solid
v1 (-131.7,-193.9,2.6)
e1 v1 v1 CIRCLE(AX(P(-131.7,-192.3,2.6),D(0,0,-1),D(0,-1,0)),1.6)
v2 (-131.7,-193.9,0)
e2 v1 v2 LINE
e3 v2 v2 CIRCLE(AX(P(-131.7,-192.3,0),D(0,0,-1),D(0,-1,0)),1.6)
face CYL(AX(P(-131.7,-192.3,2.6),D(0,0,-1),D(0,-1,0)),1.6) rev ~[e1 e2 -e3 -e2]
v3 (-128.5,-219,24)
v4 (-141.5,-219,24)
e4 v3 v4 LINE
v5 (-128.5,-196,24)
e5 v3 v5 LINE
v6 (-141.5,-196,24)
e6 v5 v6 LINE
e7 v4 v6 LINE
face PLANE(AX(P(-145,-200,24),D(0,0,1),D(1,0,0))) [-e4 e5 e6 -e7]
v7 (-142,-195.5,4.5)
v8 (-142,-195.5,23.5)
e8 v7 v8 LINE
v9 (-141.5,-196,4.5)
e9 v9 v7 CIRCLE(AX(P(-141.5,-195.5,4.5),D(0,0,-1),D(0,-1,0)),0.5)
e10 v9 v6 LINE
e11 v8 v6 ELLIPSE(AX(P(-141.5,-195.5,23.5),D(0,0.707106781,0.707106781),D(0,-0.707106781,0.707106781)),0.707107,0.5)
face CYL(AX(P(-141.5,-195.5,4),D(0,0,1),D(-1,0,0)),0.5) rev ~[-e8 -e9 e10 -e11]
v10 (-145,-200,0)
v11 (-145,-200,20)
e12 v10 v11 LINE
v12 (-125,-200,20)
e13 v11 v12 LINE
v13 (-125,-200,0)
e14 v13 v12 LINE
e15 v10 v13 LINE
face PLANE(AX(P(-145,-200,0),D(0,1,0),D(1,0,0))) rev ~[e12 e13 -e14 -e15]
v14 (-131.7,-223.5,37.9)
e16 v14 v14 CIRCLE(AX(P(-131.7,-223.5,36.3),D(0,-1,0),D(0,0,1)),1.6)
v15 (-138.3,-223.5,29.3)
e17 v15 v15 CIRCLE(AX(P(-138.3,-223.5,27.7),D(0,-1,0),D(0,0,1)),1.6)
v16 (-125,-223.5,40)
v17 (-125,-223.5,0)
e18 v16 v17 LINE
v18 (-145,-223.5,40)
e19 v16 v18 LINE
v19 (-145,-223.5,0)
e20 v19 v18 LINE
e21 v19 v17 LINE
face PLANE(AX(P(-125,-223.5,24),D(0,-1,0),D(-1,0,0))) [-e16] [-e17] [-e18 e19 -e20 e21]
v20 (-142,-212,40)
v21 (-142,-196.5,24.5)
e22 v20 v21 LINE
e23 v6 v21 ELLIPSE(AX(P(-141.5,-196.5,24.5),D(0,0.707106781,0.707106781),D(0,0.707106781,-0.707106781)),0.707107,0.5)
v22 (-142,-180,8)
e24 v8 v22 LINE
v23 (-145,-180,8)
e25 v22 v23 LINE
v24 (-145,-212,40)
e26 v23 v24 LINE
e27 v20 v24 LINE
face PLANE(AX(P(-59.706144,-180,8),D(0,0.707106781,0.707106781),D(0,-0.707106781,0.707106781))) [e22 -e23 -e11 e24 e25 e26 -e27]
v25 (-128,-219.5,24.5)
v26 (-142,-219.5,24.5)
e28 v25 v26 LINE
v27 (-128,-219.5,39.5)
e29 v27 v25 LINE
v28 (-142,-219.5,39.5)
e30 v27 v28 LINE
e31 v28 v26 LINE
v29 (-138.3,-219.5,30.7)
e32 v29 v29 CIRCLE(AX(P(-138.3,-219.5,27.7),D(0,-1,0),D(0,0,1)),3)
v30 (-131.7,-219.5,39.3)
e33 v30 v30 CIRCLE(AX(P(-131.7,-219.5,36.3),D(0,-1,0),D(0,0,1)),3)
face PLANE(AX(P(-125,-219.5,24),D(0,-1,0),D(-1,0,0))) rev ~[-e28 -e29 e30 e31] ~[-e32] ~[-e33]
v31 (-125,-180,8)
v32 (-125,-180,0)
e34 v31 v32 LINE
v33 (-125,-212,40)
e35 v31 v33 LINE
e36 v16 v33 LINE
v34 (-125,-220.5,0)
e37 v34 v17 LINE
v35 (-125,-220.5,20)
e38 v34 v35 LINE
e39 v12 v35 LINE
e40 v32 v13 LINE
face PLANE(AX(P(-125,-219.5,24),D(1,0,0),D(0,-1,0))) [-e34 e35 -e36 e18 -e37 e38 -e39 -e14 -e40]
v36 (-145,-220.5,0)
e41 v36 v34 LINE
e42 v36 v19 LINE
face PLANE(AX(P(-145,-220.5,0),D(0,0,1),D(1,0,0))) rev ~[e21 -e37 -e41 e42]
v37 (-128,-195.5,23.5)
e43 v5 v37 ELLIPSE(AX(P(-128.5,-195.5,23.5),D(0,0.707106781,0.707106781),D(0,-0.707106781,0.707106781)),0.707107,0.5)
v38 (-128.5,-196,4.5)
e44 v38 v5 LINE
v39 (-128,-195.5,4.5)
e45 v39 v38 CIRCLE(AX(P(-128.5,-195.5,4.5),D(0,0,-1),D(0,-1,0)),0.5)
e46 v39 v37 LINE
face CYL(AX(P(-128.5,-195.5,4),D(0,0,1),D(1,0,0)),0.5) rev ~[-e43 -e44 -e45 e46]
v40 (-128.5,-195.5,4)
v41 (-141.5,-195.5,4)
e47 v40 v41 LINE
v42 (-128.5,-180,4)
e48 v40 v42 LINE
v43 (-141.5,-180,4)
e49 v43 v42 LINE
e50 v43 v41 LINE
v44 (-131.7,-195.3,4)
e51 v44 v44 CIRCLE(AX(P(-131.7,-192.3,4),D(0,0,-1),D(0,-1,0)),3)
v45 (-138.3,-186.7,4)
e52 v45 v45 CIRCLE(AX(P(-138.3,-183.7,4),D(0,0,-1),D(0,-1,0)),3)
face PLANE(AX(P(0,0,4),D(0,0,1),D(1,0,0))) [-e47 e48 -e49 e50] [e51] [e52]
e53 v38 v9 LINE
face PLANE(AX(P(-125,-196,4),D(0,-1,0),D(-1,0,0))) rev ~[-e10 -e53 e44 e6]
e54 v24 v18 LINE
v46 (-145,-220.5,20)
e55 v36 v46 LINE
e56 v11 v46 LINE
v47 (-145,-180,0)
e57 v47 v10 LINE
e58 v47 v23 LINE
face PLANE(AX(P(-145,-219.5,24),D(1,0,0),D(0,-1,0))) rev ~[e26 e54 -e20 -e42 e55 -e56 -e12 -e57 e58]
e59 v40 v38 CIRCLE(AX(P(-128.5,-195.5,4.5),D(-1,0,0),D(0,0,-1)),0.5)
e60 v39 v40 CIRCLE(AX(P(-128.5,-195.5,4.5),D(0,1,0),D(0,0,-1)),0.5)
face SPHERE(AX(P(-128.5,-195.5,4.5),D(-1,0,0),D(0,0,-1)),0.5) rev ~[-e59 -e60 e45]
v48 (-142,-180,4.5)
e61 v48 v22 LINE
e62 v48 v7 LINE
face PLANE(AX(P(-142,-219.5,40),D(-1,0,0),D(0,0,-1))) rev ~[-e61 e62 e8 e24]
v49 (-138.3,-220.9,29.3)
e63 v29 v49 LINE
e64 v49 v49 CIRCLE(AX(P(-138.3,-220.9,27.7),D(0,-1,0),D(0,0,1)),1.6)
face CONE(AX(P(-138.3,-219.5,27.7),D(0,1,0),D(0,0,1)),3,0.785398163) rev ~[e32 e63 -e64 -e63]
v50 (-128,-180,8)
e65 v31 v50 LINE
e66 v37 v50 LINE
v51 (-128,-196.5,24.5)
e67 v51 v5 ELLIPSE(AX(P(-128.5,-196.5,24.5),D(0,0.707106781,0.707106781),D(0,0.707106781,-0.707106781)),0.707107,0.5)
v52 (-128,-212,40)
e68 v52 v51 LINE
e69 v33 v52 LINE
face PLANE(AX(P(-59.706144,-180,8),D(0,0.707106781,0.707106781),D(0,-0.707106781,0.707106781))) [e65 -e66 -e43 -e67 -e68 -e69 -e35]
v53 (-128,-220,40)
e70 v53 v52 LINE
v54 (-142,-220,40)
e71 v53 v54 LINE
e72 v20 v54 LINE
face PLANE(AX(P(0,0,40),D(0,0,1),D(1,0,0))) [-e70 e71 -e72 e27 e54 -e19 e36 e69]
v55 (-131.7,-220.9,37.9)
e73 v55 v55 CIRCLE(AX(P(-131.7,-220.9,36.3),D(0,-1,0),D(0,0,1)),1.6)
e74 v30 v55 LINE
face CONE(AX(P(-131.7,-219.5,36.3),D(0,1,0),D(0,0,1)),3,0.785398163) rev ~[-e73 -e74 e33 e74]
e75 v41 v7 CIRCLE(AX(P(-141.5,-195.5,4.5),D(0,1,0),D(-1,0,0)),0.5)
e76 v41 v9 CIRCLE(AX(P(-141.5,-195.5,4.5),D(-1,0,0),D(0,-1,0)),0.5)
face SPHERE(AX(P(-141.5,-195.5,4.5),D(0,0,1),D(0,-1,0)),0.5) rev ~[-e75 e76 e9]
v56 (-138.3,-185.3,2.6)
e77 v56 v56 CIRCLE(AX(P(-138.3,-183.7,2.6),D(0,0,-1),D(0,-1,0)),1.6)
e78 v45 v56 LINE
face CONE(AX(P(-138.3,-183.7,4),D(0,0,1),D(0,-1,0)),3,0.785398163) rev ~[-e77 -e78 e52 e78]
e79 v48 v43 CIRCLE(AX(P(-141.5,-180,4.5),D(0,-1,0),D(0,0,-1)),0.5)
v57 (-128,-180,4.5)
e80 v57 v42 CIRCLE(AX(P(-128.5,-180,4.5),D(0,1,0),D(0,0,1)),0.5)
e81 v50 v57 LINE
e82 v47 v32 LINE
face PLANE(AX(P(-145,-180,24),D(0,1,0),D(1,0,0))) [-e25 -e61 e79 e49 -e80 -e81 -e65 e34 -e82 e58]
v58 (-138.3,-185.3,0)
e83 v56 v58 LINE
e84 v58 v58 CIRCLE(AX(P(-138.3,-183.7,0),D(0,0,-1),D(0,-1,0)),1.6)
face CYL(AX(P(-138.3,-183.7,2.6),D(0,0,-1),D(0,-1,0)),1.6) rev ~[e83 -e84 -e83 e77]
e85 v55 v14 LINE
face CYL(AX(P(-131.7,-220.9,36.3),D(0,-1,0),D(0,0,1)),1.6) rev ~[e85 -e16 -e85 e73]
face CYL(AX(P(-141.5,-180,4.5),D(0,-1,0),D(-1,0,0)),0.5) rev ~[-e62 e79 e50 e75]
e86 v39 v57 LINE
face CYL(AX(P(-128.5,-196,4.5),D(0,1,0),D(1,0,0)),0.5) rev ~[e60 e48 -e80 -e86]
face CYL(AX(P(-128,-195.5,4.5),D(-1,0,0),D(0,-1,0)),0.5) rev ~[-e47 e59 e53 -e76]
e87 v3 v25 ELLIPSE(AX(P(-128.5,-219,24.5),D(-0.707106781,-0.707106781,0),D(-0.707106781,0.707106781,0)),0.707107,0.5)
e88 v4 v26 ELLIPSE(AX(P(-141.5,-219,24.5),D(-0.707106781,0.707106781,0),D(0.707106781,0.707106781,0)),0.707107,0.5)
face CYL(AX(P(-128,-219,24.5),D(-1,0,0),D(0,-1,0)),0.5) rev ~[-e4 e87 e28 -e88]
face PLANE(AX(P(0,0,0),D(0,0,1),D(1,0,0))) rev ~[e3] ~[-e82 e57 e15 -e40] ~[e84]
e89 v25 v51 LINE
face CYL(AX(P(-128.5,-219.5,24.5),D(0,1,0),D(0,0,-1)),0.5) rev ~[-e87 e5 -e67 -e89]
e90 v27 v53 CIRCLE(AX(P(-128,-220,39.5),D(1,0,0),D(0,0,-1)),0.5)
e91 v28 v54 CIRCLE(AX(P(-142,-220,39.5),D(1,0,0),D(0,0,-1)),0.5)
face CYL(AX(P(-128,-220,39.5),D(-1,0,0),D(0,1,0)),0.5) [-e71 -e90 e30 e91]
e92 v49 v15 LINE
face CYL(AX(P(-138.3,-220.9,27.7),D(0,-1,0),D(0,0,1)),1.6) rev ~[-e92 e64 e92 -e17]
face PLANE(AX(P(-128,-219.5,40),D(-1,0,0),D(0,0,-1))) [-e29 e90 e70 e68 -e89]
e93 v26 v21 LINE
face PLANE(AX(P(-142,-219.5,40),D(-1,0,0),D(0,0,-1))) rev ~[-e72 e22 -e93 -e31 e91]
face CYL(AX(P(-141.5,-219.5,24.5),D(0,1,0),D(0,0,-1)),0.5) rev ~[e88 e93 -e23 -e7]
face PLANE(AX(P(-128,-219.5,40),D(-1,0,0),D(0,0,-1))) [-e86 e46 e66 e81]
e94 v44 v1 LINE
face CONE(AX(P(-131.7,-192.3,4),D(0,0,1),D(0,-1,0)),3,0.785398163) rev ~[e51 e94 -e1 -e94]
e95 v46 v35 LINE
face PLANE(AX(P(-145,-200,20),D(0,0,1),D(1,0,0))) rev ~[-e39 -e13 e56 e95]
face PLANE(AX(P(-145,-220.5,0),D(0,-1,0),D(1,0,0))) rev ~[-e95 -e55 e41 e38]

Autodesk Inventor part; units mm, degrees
ref_plane "YZ Plane" through (0, 0, 0) normal (1, 0, 0) x (0, 1, 0)
ref_plane "XZ Plane" through (0, 0, 0) normal (0, 1, 0) x (-1, 0, 0)
ref_plane "Plano de trabajo1" through (0, 0, 0) normal (0, 0, 1) x (1, 0, 0)
sketch "Boceto1" plane through (0, 0, 0) normal (0, 0, 1) x (1, 0, 0)
  line L0 (-395, -200.5) -> (-395, -220.5) projected
  line L1 (-395, -220.5) -> (335, -220.5) projected
  line L2 (335, -200.5) -> (335, -220.5) projected
  line L3 (-395, -200.5) -> (335, -200.5) projected
  line L4 (-145, 767.5) -> (-145, -767.5) projected
  line L5 (-145, -767.5) -> (145, -767.5) projected
  line L6 (145, -767.5) -> (145, 767.5) projected
  line L7 (145, 767.5) -> (-145, 767.5) projected
  line L8 (335.5, -200) -> (335.5, -221)
  line L9 (335.5, -221) -> (-395.5, -221)
  line L10 (-395.5, -221) -> (-395.5, -200)
  line L11 (-395.5, -200) -> (335.5, -200)
  line L12 (-145, -200) -> (-145, -180)
  line L13 (-145, -180) -> (-125, -180)
  line L14 (-125, -180) -> (-125, -200)
  line L15 (-125, -200) -> (-145, -200)
  line L16 (-145, -200) -> (-145, -180)
  point P0 (0, 0)
  dimension "d0" = 0.5
  dimension "d1" = 20
  dimension "d2" = 20
  dimension "d3" = 20
extrude "Extrusión1" add sketch "Boceto1" along normal blind 4 contours L4 L13 L14 L11
sketch "Boceto3" plane through (0, 0, 4) normal (0, 0, 1) x (1, 0, 0)
  line L0 (-125, -180) -> (-145, -180) projected
  line L1 (-145, -180) -> (-145, -200) projected
  line L2 (-145, -200) -> (-125, -200) projected
  line L3 (-125, -200) -> (-125, -180) projected
  line L4 (-145, -200) -> (-125, -200)
  line L5 (-125, -200) -> (-125, -196)
  line L6 (-125, -196) -> (-145, -196)
  line L7 (-145, -196) -> (-145, -200)
  point P0 (0, 0)
  dimension "d6" = 4
extrude "Extrusión2" add sketch "Boceto3" along normal blind 20 contours L3 L2 L1 L6
sketch "Boceto4" plane through (-145, -200, 0) normal (0, -1, 0) x (1, 0, 0)
  line L0 (0, 0) -> (20, 0) projected
  line L1 (20, 0) -> (20, 24) projected
  line L2 (0, 24) -> (20, 24) projected
  line L3 (0, 0) -> (0, 24) projected
  line L4 (0, 24) -> (20, 24) projected
  line L5 (20, 24) -> (0, 24)
  line L6 (0, 24) -> (0, 20)
  line L7 (0, 20) -> (20, 20)
  line L8 (20, 20) -> (20, 24)
  point P0 (145, 0)
  dimension "d9" = 4
extrude "Extrusión3" add sketch "Boceto4" along normal blind 20.5 contours L3 L2 L1 L7
sketch "Boceto6" plane through (0, 0, 4) normal (0, 0, 1) x (1, 0, 0)
  line L0 (-145, -196) -> (-125, -196) projected
  line L1 (-125, -196) -> (-125, -180) projected
  line L2 (-125, -180) -> (-145, -180) projected
  line L3 (-145, -180) -> (-145, -196) projected
  line L4 (-145, -180) -> (-142, -180)
  line L5 (-142, -180) -> (-142, -196)
  line L6 (-142, -196) -> (-145, -196)
  line L7 (-145, -196) -> (-145, -180)
  line L8 (-125, -196) -> (-128, -196)
  line L9 (-128, -196) -> (-128, -180)
  line L10 (-128, -180) -> (-125, -180)
  line L11 (-125, -180) -> (-125, -196)
  point P0 (0, 0)
  dimension "d12" = 3
  dimension "d13" = 16
  dimension "d14" = 3
extrude "Extrusión4" add sketch "Boceto6" along normal blind 20 contours L3 L2 L5 L0 | L9 L2 L1 L0
chamfer "Chaflán1" [suppressed]
sketch "Boceto7" plane through (0, 0, 4) normal (0, 0, 1) x (1, 0, 0)
  line L0 (-142, -180) -> (-142, -196) projected
  line L1 (-142, -196) -> (-128, -196) projected
  line L2 (-128, -196) -> (-128, -180) projected
  line L3 (-128, -180) -> (-142, -180) projected
  line L4 (-138.3, -192.3) -> (-138.3, -183.7)
  line L5 (-138.3, -183.7) -> (-131.7, -183.7)
  line L6 (-131.7, -183.7) -> (-131.7, -192.3)
  line L7 (-131.7, -192.3) -> (-138.3, -192.3)
  circle A0 centre (-138.3, -183.7) radius 3
  circle A1 centre (-131.7, -192.3) radius 3
  circle A2 centre (-138.3, -183.7) radius 1.65
  circle A3 centre (-131.7, -192.3) radius 1.65
  point P0 (0, 0)
  dimension "d20" = 3.7
  dimension "d21" = 6
  dimension "d22" = 6
  dimension "d23" = 3.3
  dimension "d24" = 3.3
hole "Agujero1" at (-138.3, -183.7, 4) at (-131.7, -192.3, 4) direction (0, 0, -1) diameter 3.2 end through all countersink diameter 6 countersink angle 90
sketch "Boceto8" plane through (-145, -220.5, 0) normal (0, -1, 0) x (1, 0, 0)
  line L0 (17, 24) -> (17, 4) projected
  line L1 (20, 20) -> (0, 20) projected
  line L2 (0, 0) -> (0, 20) projected
  line L3 (0, 0) -> (20, 0) projected
  line L4 (20, 0) -> (20, 20) projected
  line L5 (20, 20) -> (20, 24) projected
  line L6 (20, 24) -> (0, 24) projected
  line L7 (0, 24) -> (0, 20) projected
  line L8 (0, 20) -> (20, 20) projected
  point P0 (145, 0)
extrude "Extrusión5" add sketch "Boceto8" along normal blind 3
sketch "Boceto9" plane through (0, 0, 24) normal (0, 0, 1) x (1, 0, 0)
  line L0 (-145, -180) -> (-145, -223.5) projected
  line L1 (-125, -223.5) -> (-145, -223.5) projected
  line L2 (-125, -180) -> (-125, -223.5) projected
  line L3 (-128, -196) -> (-142, -196) projected
  line L4 (-145, -223.5) -> (-125, -223.5)
  line L5 (-125, -223.5) -> (-125, -219.5)
  line L6 (-125, -219.5) -> (-145, -219.5)
  line L7 (-145, -219.5) -> (-145, -223.5)
  line L8 (-125, -180) -> (-128, -180) projected
  line L9 (-128, -180) -> (-128, -196) projected
  line L10 (-142, -196) -> (-142, -180) projected
  line L11 (-142, -180) -> (-145, -180) projected
  point P0 (0, 0)
  dimension "d35" = 4
extrude "Extrusión6" add sketch "Boceto9" along normal blind 16 contours L6 L2 L1 L0
sketch "Boceto10" plane through (-145, -219.5, 24) normal (0, 1, 0) x (1, 0, 0)
  line L0 (0, 0) -> (20, 0) projected
  line L1 (0, 0) -> (0, -16) projected
  line L2 (20, -16) -> (0, -16) projected
  line L3 (20, 0) -> (20, -16) projected
  line L4 (20, -16) -> (17, -16)
  line L5 (17, -16) -> (17, 0)
  line L6 (17, 0) -> (20, 0)
  line L7 (20, 0) -> (20, -16)
  line L8 (0, -16) -> (3, -16)
  line L9 (3, -16) -> (3, 0)
  line L10 (3, 0) -> (0, 0)
  line L11 (0, 0) -> (0, -16)
  point P0 (145, 24)
  point P1 (3, -16)
  point P2 (3, 0)
  point P3 (17, -16)
  dimension "d38" = 3
  dimension "d39" = 3
  dimension "d40" = 16
extrude "Extrusión7" add sketch "Boceto10" along normal up to surface (39.5 mm away) contours L0 L9 L2 L1 | L0 L3 L2 L5
chamfer "Chaflán2" [suppressed]
chamfer "Chaflán3" [suppressed]
sketch "Boceto11" plane through (-142, -219.5, 24) normal (0, 1, 0) x (1, 0, 0)
  line L0 (0, 0) -> (0, -16) projected
  line L1 (14, -16) -> (0, -16) projected
  line L2 (14, -16) -> (14, 0) projected
  line L3 (0, 0) -> (14, 0) projected
  line L4 (3.7, -12.3) -> (3.7, -3.7)
  line L5 (3.7, -3.7) -> (10.3, -3.7)
  line L6 (10.3, -3.7) -> (10.3, -12.3)
  line L7 (10.3, -12.3) -> (3.7, -12.3)
  circle A0 centre (3.7, -3.7) radius 1.6
  circle A1 centre (10.3, -12.3) radius 1.6
  point P0 (142, 24)
  dimension "d49" = 3.7
  dimension "d50" = 3.2
  dimension "d51" = 3.2
hole "Agujero2" at (-131.7, -219.5, 36.3) at (-138.3, -219.5, 27.7) direction (0, -1, 0) diameter 3.2 end through all countersink diameter 6 countersink angle 90
fillet "Empalme2" radius 0.5 9 edges at (-135, -219.5, 40) (-142, -207.75, 24) (-128, -207.75, 24) (-135, -219.5, 24) (-142, -196, 14) (-135, -196, 4) (-142, -188, 4) (-128, -188, 4) (-128, -196, 14)
chamfer "Chaflán4" distance 32 angle 45 2 edges at (-143.5, -180, 40) (-126.5, -180, 40)
properties part number "Uniont"
